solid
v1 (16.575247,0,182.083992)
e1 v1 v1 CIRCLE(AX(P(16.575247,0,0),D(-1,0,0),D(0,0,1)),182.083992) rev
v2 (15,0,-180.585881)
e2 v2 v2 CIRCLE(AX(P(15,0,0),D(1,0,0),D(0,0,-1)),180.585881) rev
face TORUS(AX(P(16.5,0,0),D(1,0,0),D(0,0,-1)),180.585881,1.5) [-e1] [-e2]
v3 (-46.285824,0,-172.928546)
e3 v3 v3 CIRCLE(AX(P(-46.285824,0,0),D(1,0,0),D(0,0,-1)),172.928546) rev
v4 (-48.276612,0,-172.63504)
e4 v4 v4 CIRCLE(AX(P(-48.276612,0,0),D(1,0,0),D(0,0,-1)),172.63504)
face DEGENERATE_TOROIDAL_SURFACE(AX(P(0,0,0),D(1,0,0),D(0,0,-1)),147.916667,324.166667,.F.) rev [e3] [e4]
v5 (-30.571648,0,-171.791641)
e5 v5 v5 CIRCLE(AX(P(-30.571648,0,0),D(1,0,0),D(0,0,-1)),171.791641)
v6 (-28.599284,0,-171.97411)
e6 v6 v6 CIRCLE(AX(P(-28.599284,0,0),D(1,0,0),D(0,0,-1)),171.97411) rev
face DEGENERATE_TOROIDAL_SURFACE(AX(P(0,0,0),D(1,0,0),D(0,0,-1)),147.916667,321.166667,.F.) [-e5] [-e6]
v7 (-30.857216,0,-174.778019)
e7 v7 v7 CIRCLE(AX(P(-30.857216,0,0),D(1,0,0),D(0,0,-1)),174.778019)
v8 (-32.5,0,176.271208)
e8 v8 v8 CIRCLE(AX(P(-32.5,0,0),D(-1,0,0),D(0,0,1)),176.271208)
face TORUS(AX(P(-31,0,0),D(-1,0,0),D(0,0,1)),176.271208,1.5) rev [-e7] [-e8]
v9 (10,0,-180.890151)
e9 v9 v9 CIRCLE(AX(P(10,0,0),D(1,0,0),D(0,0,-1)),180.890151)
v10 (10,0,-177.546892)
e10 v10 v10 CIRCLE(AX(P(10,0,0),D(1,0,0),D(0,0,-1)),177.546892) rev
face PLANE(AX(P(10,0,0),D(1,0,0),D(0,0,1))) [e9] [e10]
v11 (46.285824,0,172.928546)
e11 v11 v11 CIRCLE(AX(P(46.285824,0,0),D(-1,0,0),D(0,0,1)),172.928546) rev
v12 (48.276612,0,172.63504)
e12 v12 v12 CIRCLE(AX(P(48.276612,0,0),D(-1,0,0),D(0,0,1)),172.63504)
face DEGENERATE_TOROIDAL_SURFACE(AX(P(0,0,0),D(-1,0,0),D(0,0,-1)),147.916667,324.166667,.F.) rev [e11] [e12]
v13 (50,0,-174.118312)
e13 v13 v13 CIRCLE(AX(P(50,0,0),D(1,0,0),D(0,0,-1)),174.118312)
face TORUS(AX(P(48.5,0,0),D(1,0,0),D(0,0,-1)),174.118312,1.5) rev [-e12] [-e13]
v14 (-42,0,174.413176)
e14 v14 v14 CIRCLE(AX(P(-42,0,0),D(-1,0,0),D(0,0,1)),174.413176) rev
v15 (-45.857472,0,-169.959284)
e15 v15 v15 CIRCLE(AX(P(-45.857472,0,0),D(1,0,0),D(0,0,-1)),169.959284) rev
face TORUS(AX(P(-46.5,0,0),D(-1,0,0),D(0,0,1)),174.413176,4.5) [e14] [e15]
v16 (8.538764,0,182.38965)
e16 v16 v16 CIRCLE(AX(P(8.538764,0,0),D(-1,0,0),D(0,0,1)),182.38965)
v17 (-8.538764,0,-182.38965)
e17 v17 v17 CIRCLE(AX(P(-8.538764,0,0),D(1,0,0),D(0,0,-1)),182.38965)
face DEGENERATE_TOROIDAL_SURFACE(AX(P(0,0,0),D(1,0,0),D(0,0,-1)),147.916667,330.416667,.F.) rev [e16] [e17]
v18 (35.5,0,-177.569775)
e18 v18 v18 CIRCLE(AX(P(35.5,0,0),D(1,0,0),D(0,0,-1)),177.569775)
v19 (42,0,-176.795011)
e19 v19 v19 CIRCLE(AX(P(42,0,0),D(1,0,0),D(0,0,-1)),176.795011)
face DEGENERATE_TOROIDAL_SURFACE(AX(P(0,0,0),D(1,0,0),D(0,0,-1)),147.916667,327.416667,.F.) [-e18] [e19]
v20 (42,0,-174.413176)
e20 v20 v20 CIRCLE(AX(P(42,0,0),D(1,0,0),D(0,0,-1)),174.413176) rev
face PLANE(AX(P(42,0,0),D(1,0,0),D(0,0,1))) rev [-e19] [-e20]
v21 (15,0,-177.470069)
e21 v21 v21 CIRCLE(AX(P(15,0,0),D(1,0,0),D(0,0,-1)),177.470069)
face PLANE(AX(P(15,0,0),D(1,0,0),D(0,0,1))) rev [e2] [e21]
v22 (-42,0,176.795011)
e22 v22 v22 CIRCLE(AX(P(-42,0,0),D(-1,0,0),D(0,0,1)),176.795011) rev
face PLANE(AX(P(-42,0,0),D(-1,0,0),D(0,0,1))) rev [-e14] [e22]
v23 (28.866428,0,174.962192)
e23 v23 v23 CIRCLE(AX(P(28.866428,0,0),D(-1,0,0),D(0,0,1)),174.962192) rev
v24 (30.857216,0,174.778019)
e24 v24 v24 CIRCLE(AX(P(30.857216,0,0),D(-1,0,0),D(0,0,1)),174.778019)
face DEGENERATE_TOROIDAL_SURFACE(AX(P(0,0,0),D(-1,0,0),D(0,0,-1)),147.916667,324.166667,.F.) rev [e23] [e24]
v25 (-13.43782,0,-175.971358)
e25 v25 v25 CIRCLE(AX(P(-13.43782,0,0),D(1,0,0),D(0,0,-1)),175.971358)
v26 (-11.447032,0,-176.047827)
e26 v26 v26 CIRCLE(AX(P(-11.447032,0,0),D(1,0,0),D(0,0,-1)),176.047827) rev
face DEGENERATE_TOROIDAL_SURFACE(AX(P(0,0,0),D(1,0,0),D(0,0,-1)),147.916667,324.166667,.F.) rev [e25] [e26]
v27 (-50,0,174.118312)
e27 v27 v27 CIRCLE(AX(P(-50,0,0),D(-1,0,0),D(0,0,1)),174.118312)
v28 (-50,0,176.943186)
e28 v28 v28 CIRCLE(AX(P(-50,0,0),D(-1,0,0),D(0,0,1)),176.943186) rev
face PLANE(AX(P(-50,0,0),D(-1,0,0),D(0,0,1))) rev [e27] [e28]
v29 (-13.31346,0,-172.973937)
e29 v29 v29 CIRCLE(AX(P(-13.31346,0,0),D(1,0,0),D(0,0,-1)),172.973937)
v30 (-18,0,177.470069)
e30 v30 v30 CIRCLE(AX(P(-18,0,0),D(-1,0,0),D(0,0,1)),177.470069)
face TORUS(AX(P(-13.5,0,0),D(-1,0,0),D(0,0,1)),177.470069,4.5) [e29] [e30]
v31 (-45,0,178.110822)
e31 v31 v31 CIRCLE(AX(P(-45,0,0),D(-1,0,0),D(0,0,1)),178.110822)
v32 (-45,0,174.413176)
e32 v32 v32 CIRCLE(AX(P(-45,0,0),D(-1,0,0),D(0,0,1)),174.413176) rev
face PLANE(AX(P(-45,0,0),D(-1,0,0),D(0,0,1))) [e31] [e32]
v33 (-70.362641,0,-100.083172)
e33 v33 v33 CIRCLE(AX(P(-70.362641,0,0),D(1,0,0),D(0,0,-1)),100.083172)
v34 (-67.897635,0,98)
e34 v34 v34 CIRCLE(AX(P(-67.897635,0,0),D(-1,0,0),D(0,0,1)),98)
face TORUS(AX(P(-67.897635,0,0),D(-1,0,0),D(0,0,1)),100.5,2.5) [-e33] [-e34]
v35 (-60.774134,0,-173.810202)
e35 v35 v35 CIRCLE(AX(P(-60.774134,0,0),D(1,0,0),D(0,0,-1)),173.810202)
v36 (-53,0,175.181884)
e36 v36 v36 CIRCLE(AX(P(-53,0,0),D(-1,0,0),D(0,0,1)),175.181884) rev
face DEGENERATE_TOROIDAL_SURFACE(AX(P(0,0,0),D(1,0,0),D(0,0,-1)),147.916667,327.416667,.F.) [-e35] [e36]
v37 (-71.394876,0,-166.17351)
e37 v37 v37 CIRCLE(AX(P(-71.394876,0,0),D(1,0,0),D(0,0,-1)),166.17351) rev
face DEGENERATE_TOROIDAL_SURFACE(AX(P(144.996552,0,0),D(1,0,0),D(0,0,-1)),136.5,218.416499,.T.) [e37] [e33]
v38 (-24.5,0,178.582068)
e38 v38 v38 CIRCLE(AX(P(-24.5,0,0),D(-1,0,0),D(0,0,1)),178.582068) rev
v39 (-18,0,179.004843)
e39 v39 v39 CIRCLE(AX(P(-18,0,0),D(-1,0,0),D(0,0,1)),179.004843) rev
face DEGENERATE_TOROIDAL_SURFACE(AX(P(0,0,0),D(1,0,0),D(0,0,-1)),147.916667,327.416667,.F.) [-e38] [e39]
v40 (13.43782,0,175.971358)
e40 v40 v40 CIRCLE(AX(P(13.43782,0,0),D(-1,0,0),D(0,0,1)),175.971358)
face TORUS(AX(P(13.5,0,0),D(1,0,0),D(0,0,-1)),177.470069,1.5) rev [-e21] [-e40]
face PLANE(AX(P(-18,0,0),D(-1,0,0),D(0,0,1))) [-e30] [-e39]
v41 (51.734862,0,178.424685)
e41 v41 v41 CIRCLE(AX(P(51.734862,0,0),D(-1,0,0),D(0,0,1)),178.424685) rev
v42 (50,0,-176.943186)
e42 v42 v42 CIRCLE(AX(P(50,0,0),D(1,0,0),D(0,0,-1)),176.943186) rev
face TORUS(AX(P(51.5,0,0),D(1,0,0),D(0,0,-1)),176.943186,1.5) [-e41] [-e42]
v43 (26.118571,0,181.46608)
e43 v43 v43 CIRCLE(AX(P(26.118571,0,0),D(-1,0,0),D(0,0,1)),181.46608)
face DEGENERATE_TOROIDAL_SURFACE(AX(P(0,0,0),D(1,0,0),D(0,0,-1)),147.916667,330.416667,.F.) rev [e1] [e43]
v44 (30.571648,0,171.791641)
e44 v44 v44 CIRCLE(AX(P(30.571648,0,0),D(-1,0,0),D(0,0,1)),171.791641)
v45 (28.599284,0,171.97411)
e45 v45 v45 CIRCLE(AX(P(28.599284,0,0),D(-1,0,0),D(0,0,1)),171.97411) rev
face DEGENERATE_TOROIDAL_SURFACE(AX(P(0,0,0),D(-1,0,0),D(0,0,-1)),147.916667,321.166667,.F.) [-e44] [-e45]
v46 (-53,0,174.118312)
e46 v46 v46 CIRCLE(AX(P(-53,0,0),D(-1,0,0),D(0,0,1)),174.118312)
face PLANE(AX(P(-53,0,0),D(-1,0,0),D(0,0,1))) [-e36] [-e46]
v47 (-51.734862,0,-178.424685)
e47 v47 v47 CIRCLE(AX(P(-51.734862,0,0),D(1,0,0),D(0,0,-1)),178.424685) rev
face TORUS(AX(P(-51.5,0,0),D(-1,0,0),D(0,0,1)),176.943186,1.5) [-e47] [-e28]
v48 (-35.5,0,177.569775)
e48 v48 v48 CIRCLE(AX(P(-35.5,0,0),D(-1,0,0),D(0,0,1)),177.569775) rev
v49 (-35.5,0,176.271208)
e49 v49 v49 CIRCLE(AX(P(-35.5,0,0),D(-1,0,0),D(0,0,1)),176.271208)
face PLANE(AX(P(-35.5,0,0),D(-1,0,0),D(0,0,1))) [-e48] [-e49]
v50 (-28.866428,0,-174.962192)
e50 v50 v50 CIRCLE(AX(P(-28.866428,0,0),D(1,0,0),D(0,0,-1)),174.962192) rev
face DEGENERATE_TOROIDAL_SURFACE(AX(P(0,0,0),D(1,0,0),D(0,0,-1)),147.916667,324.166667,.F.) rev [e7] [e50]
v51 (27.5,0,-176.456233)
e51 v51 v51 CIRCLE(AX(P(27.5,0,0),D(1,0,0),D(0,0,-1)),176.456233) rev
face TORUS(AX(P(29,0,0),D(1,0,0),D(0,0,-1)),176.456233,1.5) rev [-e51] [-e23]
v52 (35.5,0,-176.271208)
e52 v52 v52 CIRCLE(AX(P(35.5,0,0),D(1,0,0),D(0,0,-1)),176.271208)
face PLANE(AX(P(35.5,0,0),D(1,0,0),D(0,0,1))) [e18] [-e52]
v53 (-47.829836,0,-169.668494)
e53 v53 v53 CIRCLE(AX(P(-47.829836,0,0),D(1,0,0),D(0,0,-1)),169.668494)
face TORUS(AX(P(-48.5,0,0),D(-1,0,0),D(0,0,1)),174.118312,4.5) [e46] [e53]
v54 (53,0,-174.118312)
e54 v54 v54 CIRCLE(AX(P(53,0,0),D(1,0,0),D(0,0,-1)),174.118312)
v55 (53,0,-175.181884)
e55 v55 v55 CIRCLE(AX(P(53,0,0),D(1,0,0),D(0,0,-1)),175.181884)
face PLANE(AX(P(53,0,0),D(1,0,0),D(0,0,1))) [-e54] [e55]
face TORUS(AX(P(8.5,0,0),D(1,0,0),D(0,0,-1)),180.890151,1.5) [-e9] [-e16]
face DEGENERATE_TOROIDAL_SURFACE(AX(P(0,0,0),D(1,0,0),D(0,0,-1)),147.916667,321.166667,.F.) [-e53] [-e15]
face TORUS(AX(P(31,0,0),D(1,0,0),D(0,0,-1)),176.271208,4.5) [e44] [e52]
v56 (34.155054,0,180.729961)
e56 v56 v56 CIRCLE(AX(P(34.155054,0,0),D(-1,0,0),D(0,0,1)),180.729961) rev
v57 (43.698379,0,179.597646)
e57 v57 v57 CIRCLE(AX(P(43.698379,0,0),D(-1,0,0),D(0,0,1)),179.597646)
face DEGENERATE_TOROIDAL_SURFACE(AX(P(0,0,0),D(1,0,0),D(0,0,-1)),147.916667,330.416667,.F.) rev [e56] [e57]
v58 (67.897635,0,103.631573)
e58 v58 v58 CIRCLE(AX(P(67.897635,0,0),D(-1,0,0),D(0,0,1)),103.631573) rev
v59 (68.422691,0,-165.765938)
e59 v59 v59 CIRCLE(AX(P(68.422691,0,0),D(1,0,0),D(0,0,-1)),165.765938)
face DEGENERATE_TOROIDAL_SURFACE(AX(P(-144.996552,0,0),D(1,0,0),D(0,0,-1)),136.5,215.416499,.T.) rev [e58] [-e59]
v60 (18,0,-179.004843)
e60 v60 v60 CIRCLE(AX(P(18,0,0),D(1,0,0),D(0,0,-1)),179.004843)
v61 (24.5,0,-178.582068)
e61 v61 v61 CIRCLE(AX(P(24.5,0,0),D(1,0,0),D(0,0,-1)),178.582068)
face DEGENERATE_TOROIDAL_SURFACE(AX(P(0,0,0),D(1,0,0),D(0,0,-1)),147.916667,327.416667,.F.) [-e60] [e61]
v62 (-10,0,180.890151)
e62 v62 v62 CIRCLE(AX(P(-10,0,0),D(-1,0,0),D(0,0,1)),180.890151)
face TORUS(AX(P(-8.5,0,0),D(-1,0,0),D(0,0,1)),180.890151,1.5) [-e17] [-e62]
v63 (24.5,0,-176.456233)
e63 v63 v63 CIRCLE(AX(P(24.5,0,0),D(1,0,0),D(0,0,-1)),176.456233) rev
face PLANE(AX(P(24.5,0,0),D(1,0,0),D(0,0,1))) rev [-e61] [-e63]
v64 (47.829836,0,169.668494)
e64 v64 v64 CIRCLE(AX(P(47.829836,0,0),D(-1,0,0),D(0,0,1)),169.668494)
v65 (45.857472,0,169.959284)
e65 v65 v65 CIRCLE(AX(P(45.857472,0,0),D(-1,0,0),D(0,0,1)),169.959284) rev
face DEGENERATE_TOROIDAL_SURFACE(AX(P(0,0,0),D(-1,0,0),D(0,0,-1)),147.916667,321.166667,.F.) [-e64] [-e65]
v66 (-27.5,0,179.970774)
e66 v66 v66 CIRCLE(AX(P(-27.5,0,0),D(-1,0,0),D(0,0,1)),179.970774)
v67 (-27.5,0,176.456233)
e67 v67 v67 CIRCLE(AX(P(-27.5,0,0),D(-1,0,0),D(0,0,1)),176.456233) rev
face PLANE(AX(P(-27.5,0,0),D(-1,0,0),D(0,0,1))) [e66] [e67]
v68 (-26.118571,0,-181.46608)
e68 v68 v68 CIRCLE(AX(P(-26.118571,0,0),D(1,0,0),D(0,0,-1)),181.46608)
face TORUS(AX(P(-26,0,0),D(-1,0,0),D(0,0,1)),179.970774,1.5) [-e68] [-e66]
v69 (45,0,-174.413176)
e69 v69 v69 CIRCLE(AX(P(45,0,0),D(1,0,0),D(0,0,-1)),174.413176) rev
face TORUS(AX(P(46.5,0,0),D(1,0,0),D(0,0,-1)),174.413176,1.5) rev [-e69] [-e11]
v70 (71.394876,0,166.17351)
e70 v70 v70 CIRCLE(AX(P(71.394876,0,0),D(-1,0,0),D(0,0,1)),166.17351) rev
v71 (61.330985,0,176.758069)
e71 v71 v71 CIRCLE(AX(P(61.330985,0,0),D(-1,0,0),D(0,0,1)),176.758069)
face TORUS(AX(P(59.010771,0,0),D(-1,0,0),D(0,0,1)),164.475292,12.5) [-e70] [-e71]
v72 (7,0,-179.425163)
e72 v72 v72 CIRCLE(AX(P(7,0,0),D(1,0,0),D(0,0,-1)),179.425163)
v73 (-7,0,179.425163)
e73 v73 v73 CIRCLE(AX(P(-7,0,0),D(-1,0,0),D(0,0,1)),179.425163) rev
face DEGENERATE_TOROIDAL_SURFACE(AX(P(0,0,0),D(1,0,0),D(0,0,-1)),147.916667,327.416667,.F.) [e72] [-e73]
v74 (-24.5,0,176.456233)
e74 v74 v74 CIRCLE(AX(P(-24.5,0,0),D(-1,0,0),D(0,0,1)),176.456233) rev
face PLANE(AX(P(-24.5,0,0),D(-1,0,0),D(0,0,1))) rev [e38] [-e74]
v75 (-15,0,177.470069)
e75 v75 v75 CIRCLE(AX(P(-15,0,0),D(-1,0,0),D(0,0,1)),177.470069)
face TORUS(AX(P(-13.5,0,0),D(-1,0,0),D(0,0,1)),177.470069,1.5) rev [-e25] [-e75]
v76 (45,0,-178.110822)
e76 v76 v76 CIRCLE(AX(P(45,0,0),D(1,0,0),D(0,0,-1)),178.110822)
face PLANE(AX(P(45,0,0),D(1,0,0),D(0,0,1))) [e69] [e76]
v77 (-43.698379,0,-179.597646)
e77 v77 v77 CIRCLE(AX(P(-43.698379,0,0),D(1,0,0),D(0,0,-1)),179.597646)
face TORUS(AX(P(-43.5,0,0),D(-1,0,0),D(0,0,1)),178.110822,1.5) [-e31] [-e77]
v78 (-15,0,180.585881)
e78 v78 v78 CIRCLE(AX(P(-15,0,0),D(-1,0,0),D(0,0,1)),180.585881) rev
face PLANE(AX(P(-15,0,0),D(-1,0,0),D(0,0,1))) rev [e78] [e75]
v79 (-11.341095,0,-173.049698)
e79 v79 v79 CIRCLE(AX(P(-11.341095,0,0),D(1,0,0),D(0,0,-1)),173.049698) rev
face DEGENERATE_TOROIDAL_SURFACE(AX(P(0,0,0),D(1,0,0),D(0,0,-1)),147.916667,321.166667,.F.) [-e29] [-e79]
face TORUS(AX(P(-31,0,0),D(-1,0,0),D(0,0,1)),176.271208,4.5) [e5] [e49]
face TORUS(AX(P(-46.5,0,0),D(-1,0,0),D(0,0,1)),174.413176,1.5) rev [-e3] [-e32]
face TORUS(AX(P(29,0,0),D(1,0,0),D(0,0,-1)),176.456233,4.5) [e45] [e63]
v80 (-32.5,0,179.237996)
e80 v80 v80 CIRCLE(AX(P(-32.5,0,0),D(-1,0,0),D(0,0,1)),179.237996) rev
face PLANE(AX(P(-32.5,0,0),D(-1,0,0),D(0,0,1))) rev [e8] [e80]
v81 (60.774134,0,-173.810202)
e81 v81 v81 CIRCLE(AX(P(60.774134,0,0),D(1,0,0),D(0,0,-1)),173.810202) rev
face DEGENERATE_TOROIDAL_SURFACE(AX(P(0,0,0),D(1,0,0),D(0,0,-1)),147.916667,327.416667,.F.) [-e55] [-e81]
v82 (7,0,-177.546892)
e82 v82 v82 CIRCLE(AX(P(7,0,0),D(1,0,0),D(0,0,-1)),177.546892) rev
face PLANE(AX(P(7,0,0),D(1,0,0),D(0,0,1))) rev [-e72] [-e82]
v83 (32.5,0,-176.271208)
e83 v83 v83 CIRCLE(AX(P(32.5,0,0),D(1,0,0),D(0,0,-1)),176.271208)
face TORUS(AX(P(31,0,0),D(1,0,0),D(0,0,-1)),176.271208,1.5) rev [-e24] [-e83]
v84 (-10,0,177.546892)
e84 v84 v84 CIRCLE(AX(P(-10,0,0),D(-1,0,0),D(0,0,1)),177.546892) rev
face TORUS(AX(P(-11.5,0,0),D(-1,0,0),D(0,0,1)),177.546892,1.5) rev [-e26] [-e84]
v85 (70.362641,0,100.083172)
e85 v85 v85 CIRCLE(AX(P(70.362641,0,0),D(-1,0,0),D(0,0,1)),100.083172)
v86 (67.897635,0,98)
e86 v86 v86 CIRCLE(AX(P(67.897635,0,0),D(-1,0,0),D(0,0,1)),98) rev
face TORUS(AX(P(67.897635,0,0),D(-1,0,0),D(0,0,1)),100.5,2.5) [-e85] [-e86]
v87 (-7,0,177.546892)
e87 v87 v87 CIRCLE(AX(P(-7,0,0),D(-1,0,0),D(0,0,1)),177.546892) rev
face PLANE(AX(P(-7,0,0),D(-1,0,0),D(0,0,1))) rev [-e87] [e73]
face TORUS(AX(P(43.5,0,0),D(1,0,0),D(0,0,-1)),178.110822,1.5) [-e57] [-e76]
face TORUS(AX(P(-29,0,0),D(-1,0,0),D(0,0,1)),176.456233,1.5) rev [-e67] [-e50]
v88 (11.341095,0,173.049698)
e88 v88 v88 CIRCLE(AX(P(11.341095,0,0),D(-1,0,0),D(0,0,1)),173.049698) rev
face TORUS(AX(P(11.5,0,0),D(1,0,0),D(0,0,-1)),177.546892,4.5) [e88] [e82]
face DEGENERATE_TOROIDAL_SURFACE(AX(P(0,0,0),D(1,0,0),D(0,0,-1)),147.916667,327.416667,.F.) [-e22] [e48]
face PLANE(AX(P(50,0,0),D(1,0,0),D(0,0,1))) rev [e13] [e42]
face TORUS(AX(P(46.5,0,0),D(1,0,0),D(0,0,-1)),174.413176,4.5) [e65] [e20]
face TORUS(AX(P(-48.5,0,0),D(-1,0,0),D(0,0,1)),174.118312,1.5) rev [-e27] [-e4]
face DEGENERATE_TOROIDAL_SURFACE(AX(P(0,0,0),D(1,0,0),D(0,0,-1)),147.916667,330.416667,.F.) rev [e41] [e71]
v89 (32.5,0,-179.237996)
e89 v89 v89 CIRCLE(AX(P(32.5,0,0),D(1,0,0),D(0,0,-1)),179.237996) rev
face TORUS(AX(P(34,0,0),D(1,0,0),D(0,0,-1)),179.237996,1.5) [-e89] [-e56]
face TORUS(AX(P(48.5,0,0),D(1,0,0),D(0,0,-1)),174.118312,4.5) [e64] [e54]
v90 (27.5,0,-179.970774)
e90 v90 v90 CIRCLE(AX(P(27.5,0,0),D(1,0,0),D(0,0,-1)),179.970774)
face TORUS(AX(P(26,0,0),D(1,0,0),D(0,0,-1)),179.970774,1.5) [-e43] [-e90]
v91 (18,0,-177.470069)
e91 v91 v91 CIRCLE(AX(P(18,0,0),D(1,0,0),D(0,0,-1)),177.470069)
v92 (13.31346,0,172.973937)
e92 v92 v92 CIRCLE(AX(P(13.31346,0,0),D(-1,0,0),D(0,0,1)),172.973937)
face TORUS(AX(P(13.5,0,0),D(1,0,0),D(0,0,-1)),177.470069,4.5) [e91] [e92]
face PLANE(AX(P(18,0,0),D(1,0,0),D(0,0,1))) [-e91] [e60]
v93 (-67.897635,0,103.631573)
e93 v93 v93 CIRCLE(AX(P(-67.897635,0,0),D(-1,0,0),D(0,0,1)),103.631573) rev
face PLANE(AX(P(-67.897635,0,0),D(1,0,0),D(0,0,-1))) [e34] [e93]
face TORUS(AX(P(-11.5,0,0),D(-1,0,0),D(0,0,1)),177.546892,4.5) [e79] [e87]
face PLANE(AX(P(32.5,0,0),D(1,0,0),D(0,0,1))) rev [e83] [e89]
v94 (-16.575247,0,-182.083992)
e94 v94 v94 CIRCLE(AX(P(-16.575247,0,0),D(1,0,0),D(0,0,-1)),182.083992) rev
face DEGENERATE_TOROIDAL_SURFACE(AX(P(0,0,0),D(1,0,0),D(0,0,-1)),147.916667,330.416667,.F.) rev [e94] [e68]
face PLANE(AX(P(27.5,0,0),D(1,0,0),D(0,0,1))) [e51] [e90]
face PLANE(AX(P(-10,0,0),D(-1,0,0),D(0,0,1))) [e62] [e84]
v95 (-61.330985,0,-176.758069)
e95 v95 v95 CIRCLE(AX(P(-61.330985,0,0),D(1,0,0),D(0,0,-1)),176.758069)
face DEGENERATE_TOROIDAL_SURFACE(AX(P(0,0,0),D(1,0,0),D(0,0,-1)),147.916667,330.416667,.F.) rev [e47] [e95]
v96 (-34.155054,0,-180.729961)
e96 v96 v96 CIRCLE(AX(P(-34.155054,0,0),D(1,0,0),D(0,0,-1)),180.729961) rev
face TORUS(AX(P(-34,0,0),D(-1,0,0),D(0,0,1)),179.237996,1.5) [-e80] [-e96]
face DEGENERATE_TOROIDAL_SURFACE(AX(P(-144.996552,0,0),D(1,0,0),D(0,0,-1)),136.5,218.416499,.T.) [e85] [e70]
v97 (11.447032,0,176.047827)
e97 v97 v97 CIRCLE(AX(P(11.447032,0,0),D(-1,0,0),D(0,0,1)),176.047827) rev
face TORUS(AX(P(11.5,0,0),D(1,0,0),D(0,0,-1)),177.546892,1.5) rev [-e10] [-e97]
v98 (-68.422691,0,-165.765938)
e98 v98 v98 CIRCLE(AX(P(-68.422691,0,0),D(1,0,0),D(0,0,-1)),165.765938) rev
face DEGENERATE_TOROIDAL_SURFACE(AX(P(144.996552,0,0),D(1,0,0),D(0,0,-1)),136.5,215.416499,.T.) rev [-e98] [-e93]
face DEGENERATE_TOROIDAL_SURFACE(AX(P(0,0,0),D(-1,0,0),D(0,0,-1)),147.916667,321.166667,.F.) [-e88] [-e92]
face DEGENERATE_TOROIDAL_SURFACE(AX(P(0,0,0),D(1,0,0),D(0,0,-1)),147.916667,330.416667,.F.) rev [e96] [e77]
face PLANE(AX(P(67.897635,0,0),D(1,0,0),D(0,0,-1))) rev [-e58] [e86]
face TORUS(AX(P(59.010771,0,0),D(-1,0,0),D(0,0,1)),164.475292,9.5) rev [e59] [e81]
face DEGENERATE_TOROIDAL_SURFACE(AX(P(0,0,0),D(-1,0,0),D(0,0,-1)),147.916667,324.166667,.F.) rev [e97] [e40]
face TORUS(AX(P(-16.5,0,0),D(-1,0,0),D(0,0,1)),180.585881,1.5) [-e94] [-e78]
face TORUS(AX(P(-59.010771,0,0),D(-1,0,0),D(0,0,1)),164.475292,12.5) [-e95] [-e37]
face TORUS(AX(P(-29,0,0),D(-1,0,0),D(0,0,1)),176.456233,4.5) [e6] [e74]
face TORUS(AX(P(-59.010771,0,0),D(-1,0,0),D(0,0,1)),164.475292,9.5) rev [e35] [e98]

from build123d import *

# Parameters (mm, degrees)
CONG_1_R              = 50
CONG_2_R              = 10
CONG_3_R              = 6
CONG_4_R              = 6
CONG_3_OF_SYM_TRIE2_R = 6
CONG_4_OF_SYM_TRIE2_R = 6
ECHELLE1_SCALE        = 0.25


# Read off the part's stored shape, not the designer's step: Révolution3, Coque1
with BuildPart() as part:
    # Révolution3 outline → Révolution3 (revolve)
    with BuildSketch(Plane.YX):
        with BuildLine():
            ThreePointArc((700, -280), (730, 0), (700, 280))
            ThreePointArc((700, 280), (546, 293.679791101), (392, 280))
            Line((392, 280), (392, -280))
            ThreePointArc((392, -280), (546, -293.679791101), (700, -280))
        make_face()
    r_volution3 = revolve(axis=Axis((0, 0, 0), (1, 0, 0)))


with BuildPart() as sym_trie1_1:
    # Symétrie1: Révolution3 across plane
    add(r_volution3.mirror(Plane.XY))


with BuildPart() as part_1:
    add(part.part)

    # Symétrie1 united with what the copies to: union Symétrie1_1
    add(sym_trie1_1.part)

    # Congé1
    cong_1_edges = [part_1.edges().sort_by_distance(p)[0] for p in [
        (280, -700, 0),
        (-280, -700, 0),
    ]]
    fillet(cong_1_edges, radius=CONG_1_R)

    # Congé2
    cong_2_edges = [part_1.edges().sort_by_distance(p)[0] for p in [
        (-280, -392, 0),
        (280, -392, 0),
    ]]
    fillet(cong_2_edges, radius=CONG_2_R)

    # Esquisse3 → Enlèvement de matière-Révolution1 (revolve, cut)
    with BuildSketch(Plane.XY, mode=Mode.PRIVATE) as enl_vement_de_mati_re_r_volution1_sk:
        with BuildLine():
            ThreePointArc((-180, 717.685378346), (-190.005553524, 716.270895837), (-200, 714.779955962))
            Line((-200, 714.779955962), (-200, 689.482990651))
            ThreePointArc((-200, 689.482990651), (-190.005774489, 691.003302618), (-180, 692.445651024))
            Line((-180, 692.445651024), (-180, 717.685378346))
        make_face()
        with BuildLine():
            ThreePointArc((-110, 725.41449172), (-120.003463549, 724.540743476), (-130, 723.591018267))
            Line((-130, 723.591018267), (-130, 698.466832024))
            ThreePointArc((-130, 698.466832024), (-120.003599564, 699.435025895), (-110, 700.325765372))
            Line((-110, 700.325765372), (-110, 725.41449172))
        make_face()
        with BuildLine():
            ThreePointArc((-40, 729.394564987), (-50.001433299, 729.053831564), (-60, 728.637380808))
            Line((-60, 728.637380808), (-60, 703.611081326))
            ThreePointArc((-60, 703.611081326), (-50.001489186, 704.035573635), (-40, 704.38288657))
            Line((-40, 704.38288657), (-40, 729.394564987))
        make_face()
    enl_vement_de_mati_re_r_volution1 = revolve(enl_vement_de_mati_re_r_volution1_sk.sketch.rotate(Axis((0, 0, 0), (-1, 0, 0)), 90), axis=Axis((0, 0, 0), (-1, 0, 0)), mode=Mode.SUBTRACT)

    # Congé3
    cong_3_edges = [part_1.edges().sort_by_distance(p)[0] for p in [
        (-180, -717.685378346, 0),
        (-200, -714.779955962, 0),
        (-110, -725.41449172, 0),
        (-130, -723.591018267, 0),
        (-40, -729.394564987, 0),
        (-60, -728.637380808, 0),
    ]]
    fillet(cong_3_edges, radius=CONG_3_R)

    # Congé4
    cong_4_edges = [part_1.edges().sort_by_distance(p)[0] for p in [
        (-180, 0, 692.445651024),
        (-200, 0, 689.482990651),
        (-110, 0, 700.325765372),
        (-130, 0, 698.466832024),
        (-40, 0, 704.38288657),
        (-60, 0, 703.611081326),
    ]]
    fillet(cong_4_edges, radius=CONG_4_R)

    # Symétrie2: Enlèvement de matière-Révolution1 across plane
    add(enl_vement_de_mati_re_r_volution1.mirror(Plane(origin=(0, 0, 0), x_dir=(0, 0, 1), z_dir=(1, 0, 0))), mode=Mode.SUBTRACT)

    # Congé3 of Symétrie2
    cong_3_of_sym_trie2_edges = [part_1.edges().sort_by_distance(p)[0] for p in [
        (180, -717.685378346, 0),
        (200, -714.779955962, 0),
        (110, -725.41449172, 0),
        (130, -723.591018267, 0),
        (40, -729.394564987, 0),
        (60, -728.637380808, 0),
    ]]
    fillet(cong_3_of_sym_trie2_edges, radius=CONG_3_OF_SYM_TRIE2_R)

    # Congé4 of Symétrie2
    cong_4_of_sym_trie2_edges = [part_1.edges().sort_by_distance(p)[0] for p in [
        (180, 0, 692.445651024),
        (200, 0, 689.482990651),
        (110, 0, 700.325765372),
        (130, 0, 698.466832024),
        (40, 0, 704.38288657),
        (60, 0, 703.611081326),
    ]]
    fillet(cong_4_of_sym_trie2_edges, radius=CONG_4_OF_SYM_TRIE2_R)

    # Coque1 outline → Coque1 (revolve, cut)
    with BuildSketch(Plane.YX):
        with BuildLine():
            Line((414.526291569, 271.59054014), (392, 271.59054014))
            Line((392, 271.59054014), (392, -271.59054014))
            Line((392, -271.59054014), (414.526291569, -271.59054014))
            ThreePointArc((414.526291569, -271.59054014), (538.718897678, -281.64902779), (663.06375129, -273.690763764))
            ThreePointArc((663.06375129, -273.690763764), (684.085352011, -263.581939214), (695.240809637, -243.096534756))
            ThreePointArc((695.240809637, -243.096534756), (698.077896317, -227.564804025), (700.727537041, -212))
            Line((700.727537041, -212), (696.473249819, -212))
            ThreePointArc((696.473249819, -212), (682.830453346, -205.741980429), (678.673977688, -191.319344933))
            ThreePointArc((678.673977688, -191.319344933), (679.261678845, -187.375518731), (679.837136257, -183.42988741))
            ThreePointArc((679.837136257, -183.42988741), (685.868437277, -172.393714199), (697.652705888, -168))
            Line((697.652705888, -168), (707.180043988, -168))
            ThreePointArc((707.180043988, -168), (708.794550264, -155.007745084), (710.2790994, -142))
            Line((710.2790994, -142), (705.08483013, -142))
            ThreePointArc((705.08483013, -142), (691.764894862, -136.106994857), (687.166564821, -122.286591607))
            ThreePointArc((687.166564821, -122.286591607), (687.537583938, -118.342425531), (687.896438521, -114.397134084))
            ThreePointArc((687.896438521, -114.397134084), (693.676917933, -102.717462846), (705.824930395, -98))
            Line((705.824930395, -98), (714.328271217, -98))
            ThreePointArc((714.328271217, -98), (715.238480168, -85.00420552), (716.019372785, -72))
            Line((716.019372785, -72), (709.880276184, -72))
            ThreePointArc((709.880276184, -72), (696.891224815, -66.461321941), (691.895748315, -53.25383828))
            ThreePointArc((691.895748315, -53.25383828), (692.05333131, -49.309342324), (692.198792563, -45.364380757))
            ThreePointArc((692.198792563, -45.364380757), (697.686389494, -33.049302212), (710.187566512, -28))
            Line((710.187566512, -28), (717.700652987, -28))
            ThreePointArc((717.700652987, -28), (718, 0), (717.700652987, 28))
            Line((717.700652987, 28), (710.187566512, 28))
            ThreePointArc((710.187566512, 28), (697.686389494, 33.049302212), (692.198792563, 45.364380757))
            ThreePointArc((692.198792563, 45.364380757), (692.05333131, 49.309342324), (691.895748315, 53.25383828))
            ThreePointArc((691.895748315, 53.25383828), (696.891224815, 66.461321941), (709.880276184, 72))
            Line((709.880276184, 72), (716.019372785, 72))
            ThreePointArc((716.019372785, 72), (715.238480168, 85.00420552), (714.328271217, 98))
            Line((714.328271217, 98), (705.824930395, 98))
            ThreePointArc((705.824930395, 98), (693.676917933, 102.717462846), (687.896438521, 114.397134084))
            ThreePointArc((687.896438521, 114.397134084), (687.537583938, 118.342425531), (687.166564821, 122.286591607))
            ThreePointArc((687.166564821, 122.286591607), (691.764894862, 136.106994857), (705.08483013, 142))
            Line((705.08483013, 142), (710.2790994, 142))
            ThreePointArc((710.2790994, 142), (708.794550264, 155.007745084), (707.180043988, 168))
            Line((707.180043988, 168), (697.652705888, 168))
            ThreePointArc((697.652705888, 168), (685.868437277, 172.393714199), (679.837136257, 183.42988741))
            ThreePointArc((679.837136257, 183.42988741), (679.261678845, 187.375518731), (678.673977688, 191.319344933))
            ThreePointArc((678.673977688, 191.319344933), (682.830453346, 205.741980429), (696.473249819, 212))
            Line((696.473249819, 212), (700.727537041, 212))
            ThreePointArc((700.727537041, 212), (698.077896317, 227.564804025), (695.240809637, 243.096534756))
            ThreePointArc((695.240809637, 243.096534756), (684.085352011, 263.581939214), (663.06375129, 273.690763764))
            ThreePointArc((663.06375129, 273.690763764), (538.718897678, 281.64902779), (414.526291569, 271.59054014))
        make_face()
    revolve(axis=Axis((0, 0, 0), (1, 0, 0)), mode=Mode.SUBTRACT)


with BuildPart() as part_2:
    # Echelle1: scaled about (-3.135e-06, 7.202e-06, -3.039e-06)
    add(part_1.part.scale(ECHELLE1_SCALE).moved(Location((-2.351e-06, 5.401e-06, -2.279e-06))))


solid = part_2.part
